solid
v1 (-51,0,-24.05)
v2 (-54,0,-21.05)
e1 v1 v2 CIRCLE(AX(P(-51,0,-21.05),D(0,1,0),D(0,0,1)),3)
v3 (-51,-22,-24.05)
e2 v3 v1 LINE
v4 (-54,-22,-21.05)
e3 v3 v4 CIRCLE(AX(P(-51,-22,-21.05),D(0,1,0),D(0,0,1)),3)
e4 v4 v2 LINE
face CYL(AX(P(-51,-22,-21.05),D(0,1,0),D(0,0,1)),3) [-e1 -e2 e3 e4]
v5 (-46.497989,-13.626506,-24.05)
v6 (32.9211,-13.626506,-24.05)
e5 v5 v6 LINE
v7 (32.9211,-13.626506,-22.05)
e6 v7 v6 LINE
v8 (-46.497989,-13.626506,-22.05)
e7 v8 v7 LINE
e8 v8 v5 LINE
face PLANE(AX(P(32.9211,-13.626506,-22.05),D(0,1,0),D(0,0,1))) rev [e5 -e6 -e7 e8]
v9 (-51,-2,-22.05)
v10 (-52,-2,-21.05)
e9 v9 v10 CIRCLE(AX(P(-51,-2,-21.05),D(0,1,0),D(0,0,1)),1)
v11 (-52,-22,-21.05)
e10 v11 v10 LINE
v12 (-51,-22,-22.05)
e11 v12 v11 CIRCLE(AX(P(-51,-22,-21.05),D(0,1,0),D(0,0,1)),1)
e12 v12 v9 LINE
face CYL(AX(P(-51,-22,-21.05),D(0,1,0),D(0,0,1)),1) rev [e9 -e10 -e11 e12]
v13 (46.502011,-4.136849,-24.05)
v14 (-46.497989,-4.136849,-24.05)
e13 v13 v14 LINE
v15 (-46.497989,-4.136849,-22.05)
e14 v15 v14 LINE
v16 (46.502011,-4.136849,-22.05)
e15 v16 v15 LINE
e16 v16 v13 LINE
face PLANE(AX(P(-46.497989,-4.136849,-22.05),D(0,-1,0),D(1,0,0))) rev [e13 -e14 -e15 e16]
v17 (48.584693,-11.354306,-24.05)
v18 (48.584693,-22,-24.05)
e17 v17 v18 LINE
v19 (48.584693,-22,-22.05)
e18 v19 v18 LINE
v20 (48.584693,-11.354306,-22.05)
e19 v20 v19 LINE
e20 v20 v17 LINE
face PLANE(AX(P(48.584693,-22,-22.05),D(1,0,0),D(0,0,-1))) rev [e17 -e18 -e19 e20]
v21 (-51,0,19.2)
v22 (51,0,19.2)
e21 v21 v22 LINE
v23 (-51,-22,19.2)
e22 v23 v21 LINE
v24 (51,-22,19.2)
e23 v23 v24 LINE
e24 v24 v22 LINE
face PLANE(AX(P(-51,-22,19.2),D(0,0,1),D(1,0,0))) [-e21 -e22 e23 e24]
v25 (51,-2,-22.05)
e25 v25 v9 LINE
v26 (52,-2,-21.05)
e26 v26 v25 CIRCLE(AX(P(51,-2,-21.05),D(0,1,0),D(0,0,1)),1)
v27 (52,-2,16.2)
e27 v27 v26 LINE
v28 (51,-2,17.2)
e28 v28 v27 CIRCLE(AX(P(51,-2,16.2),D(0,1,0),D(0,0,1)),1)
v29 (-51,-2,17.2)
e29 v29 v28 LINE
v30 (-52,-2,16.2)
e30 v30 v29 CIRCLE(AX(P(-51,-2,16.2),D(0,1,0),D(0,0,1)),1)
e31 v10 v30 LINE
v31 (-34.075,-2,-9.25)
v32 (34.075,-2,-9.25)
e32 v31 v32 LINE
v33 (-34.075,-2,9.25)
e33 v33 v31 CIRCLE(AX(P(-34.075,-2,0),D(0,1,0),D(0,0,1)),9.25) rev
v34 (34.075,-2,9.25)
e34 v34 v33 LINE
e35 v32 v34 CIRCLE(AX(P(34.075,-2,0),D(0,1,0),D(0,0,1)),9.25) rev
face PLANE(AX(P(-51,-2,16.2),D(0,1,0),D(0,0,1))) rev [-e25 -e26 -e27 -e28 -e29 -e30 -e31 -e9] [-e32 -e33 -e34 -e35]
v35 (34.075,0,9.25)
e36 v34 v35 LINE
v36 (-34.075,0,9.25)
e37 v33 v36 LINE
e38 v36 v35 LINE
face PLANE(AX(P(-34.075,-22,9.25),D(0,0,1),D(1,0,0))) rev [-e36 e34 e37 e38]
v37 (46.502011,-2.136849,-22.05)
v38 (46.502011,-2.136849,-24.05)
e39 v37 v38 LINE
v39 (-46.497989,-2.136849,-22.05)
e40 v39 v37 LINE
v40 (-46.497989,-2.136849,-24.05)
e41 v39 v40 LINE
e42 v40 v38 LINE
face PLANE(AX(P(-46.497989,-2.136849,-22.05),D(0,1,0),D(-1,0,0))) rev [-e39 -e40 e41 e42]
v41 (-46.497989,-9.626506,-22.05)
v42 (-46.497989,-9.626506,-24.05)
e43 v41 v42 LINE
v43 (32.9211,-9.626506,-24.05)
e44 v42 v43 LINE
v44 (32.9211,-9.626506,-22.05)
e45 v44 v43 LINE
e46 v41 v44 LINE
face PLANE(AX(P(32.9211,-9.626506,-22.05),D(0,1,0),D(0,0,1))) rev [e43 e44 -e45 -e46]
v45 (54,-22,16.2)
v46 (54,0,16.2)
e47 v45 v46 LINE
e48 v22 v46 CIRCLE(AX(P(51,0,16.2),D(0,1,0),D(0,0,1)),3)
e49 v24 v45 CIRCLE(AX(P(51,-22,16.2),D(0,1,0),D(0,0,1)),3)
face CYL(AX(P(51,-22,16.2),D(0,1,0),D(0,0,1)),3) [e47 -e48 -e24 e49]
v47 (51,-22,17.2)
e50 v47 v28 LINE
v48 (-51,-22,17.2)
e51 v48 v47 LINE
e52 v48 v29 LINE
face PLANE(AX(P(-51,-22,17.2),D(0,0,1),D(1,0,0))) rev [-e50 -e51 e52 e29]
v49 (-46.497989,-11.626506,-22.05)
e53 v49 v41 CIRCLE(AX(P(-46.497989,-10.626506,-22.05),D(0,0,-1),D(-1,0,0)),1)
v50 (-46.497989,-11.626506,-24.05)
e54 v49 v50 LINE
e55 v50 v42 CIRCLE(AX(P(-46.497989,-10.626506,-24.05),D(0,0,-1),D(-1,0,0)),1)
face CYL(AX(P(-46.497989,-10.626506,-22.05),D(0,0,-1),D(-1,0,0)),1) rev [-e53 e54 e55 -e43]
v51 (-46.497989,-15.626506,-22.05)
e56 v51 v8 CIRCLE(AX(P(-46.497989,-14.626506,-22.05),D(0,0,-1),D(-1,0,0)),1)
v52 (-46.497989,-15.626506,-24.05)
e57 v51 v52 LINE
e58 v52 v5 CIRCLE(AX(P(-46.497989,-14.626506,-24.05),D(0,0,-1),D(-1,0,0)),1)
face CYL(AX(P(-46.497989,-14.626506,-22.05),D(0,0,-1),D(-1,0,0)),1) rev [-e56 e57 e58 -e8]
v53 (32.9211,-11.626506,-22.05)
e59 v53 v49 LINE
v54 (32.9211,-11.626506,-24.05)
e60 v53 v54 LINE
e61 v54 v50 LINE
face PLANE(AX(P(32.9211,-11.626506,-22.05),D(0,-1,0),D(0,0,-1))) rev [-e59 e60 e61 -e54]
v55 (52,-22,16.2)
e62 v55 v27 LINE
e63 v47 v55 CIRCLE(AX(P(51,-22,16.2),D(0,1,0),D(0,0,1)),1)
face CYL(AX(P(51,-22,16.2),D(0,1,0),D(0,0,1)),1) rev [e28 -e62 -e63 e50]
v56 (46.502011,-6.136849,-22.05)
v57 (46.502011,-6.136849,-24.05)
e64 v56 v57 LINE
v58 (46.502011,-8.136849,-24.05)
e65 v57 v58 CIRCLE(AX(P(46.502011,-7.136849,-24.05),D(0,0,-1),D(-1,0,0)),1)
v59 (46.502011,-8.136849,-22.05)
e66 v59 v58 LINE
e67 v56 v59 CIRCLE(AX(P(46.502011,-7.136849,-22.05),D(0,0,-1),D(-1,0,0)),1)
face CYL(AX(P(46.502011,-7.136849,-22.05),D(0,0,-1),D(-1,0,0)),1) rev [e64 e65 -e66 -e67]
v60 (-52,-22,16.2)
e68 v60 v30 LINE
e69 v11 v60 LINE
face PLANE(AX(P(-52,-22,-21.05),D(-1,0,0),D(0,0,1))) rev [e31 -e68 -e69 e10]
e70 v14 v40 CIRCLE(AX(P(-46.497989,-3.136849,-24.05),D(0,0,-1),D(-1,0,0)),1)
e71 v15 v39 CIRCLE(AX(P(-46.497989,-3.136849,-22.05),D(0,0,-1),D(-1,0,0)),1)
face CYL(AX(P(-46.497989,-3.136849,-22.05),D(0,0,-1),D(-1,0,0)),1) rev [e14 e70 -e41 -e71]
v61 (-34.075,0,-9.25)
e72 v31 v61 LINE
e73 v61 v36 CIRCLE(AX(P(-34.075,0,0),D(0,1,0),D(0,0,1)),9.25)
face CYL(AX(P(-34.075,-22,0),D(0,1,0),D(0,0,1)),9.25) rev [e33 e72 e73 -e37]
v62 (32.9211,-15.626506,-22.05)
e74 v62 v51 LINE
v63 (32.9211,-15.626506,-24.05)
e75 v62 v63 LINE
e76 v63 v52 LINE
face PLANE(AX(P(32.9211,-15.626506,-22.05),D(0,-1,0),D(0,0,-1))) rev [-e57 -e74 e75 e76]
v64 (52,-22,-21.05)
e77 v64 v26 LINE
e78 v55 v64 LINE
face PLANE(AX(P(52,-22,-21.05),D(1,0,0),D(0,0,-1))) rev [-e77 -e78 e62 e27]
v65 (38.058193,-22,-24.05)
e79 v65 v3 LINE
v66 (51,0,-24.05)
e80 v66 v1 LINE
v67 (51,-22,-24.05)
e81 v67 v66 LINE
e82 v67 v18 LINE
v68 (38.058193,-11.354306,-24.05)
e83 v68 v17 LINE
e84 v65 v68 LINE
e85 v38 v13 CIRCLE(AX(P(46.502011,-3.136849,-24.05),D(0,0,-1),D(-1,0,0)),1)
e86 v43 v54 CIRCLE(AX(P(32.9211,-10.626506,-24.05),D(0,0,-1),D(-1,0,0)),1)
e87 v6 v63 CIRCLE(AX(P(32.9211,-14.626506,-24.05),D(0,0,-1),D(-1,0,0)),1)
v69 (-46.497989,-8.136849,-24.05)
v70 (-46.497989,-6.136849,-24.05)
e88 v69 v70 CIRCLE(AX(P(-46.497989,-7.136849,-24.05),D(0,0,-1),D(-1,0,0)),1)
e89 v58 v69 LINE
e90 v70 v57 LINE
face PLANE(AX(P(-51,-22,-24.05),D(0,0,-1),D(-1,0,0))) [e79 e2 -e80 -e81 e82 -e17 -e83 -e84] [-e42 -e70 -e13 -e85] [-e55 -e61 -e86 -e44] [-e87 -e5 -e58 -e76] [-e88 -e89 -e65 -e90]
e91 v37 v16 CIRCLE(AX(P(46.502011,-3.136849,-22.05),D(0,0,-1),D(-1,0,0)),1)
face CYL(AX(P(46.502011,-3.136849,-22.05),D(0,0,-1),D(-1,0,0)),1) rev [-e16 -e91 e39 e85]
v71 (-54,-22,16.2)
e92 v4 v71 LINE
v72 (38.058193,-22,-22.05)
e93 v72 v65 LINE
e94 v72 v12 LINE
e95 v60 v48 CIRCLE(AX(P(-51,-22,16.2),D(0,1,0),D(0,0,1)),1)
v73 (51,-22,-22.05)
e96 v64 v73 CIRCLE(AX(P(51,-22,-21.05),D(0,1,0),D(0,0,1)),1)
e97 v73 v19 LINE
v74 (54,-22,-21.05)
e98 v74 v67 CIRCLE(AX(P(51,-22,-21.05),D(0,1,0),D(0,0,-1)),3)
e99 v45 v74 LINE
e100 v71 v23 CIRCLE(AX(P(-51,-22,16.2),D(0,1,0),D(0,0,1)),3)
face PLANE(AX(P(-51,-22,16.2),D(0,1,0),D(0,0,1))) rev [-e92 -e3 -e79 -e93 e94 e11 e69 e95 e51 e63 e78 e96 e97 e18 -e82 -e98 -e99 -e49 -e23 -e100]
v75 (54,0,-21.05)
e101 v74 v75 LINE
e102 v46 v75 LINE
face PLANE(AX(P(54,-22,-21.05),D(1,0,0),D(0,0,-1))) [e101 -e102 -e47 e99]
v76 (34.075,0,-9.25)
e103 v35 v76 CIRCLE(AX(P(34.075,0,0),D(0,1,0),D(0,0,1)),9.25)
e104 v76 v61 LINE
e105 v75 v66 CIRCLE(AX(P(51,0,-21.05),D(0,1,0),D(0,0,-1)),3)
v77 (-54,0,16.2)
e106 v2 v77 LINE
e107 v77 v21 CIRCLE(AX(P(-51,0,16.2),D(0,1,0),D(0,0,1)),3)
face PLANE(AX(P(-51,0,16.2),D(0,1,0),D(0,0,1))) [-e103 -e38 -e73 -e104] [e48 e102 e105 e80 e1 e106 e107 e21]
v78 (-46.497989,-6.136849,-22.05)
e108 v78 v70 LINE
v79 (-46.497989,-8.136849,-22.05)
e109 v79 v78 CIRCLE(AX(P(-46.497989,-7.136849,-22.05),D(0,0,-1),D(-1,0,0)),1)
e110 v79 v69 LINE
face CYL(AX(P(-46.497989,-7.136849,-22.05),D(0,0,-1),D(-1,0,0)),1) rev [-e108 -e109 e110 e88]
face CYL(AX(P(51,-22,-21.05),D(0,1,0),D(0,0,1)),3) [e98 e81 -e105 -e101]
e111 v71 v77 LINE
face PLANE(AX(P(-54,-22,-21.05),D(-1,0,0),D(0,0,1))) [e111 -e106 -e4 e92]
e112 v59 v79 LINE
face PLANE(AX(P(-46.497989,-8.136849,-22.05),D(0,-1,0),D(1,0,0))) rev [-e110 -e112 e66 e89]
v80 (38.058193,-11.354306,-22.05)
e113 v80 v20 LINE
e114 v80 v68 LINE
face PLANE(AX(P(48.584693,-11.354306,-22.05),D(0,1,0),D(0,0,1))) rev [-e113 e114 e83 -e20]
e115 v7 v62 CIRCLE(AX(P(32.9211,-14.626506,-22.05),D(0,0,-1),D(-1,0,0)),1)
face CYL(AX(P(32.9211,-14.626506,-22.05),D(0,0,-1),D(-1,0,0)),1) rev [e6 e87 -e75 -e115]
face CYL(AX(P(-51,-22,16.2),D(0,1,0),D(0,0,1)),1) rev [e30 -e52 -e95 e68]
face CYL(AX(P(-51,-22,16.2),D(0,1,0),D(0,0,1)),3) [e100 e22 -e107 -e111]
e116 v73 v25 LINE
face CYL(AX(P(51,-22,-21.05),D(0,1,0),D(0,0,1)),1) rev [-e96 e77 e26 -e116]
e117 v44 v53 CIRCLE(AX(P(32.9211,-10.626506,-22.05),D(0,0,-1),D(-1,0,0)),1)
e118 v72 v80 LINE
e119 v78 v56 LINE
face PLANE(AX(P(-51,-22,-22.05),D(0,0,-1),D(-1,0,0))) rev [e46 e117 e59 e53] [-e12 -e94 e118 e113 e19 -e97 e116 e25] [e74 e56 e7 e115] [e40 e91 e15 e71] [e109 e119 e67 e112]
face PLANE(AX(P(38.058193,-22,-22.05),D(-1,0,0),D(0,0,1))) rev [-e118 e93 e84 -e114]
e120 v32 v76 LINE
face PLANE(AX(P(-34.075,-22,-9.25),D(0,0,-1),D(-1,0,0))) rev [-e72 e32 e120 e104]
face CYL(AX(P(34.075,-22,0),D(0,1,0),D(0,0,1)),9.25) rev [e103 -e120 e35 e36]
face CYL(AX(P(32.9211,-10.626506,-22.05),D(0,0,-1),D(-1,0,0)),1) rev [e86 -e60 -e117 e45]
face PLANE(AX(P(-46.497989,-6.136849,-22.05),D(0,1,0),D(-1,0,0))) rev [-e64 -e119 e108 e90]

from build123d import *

# Parameters (mm, degrees)
BOSS_EXTRUDE2_DEPTH = 22
SHELL1_START        = -22
SHELL1_DEPTH        = 20
SKETCH2_W           = 99.356893422
SKETCH2_H           = 33.700277524
CUT_EXTRUDE1_DEPTH  = 20
SKETCH3_W           = 10.526500884
SKETCH3_H           = 10.645693642
CUT_EXTRUDE2_DEPTH  = 2
CUT_EXTRUDE3_DEPTH  = 2


# Read off the part's stored shape, not the designer's step: Shell1
with BuildPart() as part:
    # Sketch1 → Boss-Extrude2 (new body)
    with BuildSketch(Plane(origin=(0, 0, 0), x_dir=(1, 0, 0), z_dir=(0, 1, 0))):
        with BuildLine():
            Line((-51, 24.05), (51, 24.05))
            ThreePointArc((51, 24.05), (53.121320344, 23.171320344), (54, 21.05))
            Line((54, 21.05), (54, -16.2))
            ThreePointArc((54, -16.2), (53.121320344, -18.321320344), (51, -19.2))
            Line((51, -19.2), (-51, -19.2))
            ThreePointArc((-51, -19.2), (-53.121320344, -18.321320344), (-54, -16.2))
            Line((-54, -16.2), (-54, 21.05))
            ThreePointArc((-54, 21.05), (-53.121320344, 23.171320344), (-51, 24.05))
        make_face()
        with BuildLine():
            Line((-34.075, 9.25), (34.075, 9.25))
            ThreePointArc((34.075, 9.25), (43.325, 0), (34.075, -9.25))
            Line((34.075, -9.25), (-34.075, -9.25))
            ThreePointArc((-34.075, -9.25), (-43.325, 0), (-34.075, 9.25))
        make_face(mode=Mode.SUBTRACT)
    extrude(amount=-BOSS_EXTRUDE2_DEPTH)

    # Shell1 outline → Shell1 (cut)
    with BuildSketch(Plane(origin=(0, 0, 0), x_dir=(1, 0, 0), z_dir=(0, 1, 0)).offset(SHELL1_START)):
        with BuildLine():
            Line((-52, 21.05), (-52, -16.2))
            ThreePointArc((-52, -16.2), (-51.707106781, -16.907106781), (-51, -17.2))
            Line((-51, -17.2), (51, -17.2))
            ThreePointArc((51, -17.2), (51.707106781, -16.907106781), (52, -16.2))
            Line((52, -16.2), (52, 21.05))
            ThreePointArc((52, 21.05), (51.707106781, 21.757106781), (51, 22.05))
            Line((51, 22.05), (-51, 22.05))
            ThreePointArc((-51, 22.05), (-51.707106781, 21.757106781), (-52, 21.05))
        make_face()
        with BuildLine():
            ThreePointArc((-34.075, -11.25), (-45.325, 0), (-34.075, 11.25))
            Line((-34.075, 11.25), (34.075, 11.25))
            ThreePointArc((34.075, 11.25), (45.325, 0), (34.075, -11.25))
            Line((34.075, -11.25), (-34.075, -11.25))
        make_face(mode=Mode.SUBTRACT)
    extrude(amount=SHELL1_DEPTH, mode=Mode.SUBTRACT)

    # Sketch2 → Cut-Extrude1 (cut)
    with BuildSketch(Plane.XZ.offset(22)):
        Rectangle(SKETCH2_W, SKETCH2_H)
    extrude(amount=-CUT_EXTRUDE1_DEPTH, mode=Mode.SUBTRACT)

    # Sketch3 → Cut-Extrude2 (cut)
    with BuildSketch(Plane(origin=(0, 0, -24.05), x_dir=(-1, 0, 0), z_dir=(0, 0, -1))):
        with Locations((-43.321442995, -16.677153179)):
            Rectangle(SKETCH3_W, SKETCH3_H)
    extrude(amount=-CUT_EXTRUDE2_DEPTH, mode=Mode.SUBTRACT)

    # Sketch6 → Cut-Extrude3 (cut)
    with BuildSketch(Plane(origin=(0, 0, -24.05), x_dir=(-1, 0, 0), z_dir=(0, 0, -1))):
        with BuildLine():
            Line((46.497989358, -4.136848822), (-46.502010642, -4.136848822))
            ThreePointArc((-46.502010642, -4.136848822), (-47.502010642, -3.136848822), (-46.502010642, -2.136848822))
            Line((-46.502010642, -2.136848822), (46.497989358, -2.136848822))
            ThreePointArc((46.497989358, -2.136848822), (47.497989358, -3.136848822), (46.497989358, -4.136848822))
        make_face()
        with BuildLine():
            Line((46.497989358, -8.136848822), (-46.502010642, -8.136848822))
            ThreePointArc((-46.502010642, -8.136848822), (-47.502010642, -7.136848822), (-46.502010642, -6.136848822))
            Line((-46.502010642, -6.136848822), (46.497989358, -6.136848822))
            ThreePointArc((46.497989358, -6.136848822), (47.497989358, -7.136848822), (46.497989358, -8.136848822))
        make_face()
        with BuildLine():
            Line((-32.921100396, -9.626506099), (46.497989358, -9.626506099))
            ThreePointArc((46.497989358, -9.626506099), (47.497989358, -10.626506099), (46.497989358, -11.626506099))
            Line((46.497989358, -11.626506099), (-32.921100396, -11.626506099))
            ThreePointArc((-32.921100396, -11.626506099), (-33.921100396, -10.626506099), (-32.921100396, -9.626506099))
        make_face()
        with BuildLine():
            Line((-32.921100396, -13.626506099), (46.497989358, -13.626506099))
            ThreePointArc((46.497989358, -13.626506099), (47.497989358, -14.626506099), (46.497989358, -15.626506099))
            Line((46.497989358, -15.626506099), (-32.921100396, -15.626506099))
            ThreePointArc((-32.921100396, -15.626506099), (-33.921100396, -14.626506099), (-32.921100396, -13.626506099))
        make_face()
    extrude(amount=-CUT_EXTRUDE3_DEPTH, mode=Mode.SUBTRACT)


solid = part.part
